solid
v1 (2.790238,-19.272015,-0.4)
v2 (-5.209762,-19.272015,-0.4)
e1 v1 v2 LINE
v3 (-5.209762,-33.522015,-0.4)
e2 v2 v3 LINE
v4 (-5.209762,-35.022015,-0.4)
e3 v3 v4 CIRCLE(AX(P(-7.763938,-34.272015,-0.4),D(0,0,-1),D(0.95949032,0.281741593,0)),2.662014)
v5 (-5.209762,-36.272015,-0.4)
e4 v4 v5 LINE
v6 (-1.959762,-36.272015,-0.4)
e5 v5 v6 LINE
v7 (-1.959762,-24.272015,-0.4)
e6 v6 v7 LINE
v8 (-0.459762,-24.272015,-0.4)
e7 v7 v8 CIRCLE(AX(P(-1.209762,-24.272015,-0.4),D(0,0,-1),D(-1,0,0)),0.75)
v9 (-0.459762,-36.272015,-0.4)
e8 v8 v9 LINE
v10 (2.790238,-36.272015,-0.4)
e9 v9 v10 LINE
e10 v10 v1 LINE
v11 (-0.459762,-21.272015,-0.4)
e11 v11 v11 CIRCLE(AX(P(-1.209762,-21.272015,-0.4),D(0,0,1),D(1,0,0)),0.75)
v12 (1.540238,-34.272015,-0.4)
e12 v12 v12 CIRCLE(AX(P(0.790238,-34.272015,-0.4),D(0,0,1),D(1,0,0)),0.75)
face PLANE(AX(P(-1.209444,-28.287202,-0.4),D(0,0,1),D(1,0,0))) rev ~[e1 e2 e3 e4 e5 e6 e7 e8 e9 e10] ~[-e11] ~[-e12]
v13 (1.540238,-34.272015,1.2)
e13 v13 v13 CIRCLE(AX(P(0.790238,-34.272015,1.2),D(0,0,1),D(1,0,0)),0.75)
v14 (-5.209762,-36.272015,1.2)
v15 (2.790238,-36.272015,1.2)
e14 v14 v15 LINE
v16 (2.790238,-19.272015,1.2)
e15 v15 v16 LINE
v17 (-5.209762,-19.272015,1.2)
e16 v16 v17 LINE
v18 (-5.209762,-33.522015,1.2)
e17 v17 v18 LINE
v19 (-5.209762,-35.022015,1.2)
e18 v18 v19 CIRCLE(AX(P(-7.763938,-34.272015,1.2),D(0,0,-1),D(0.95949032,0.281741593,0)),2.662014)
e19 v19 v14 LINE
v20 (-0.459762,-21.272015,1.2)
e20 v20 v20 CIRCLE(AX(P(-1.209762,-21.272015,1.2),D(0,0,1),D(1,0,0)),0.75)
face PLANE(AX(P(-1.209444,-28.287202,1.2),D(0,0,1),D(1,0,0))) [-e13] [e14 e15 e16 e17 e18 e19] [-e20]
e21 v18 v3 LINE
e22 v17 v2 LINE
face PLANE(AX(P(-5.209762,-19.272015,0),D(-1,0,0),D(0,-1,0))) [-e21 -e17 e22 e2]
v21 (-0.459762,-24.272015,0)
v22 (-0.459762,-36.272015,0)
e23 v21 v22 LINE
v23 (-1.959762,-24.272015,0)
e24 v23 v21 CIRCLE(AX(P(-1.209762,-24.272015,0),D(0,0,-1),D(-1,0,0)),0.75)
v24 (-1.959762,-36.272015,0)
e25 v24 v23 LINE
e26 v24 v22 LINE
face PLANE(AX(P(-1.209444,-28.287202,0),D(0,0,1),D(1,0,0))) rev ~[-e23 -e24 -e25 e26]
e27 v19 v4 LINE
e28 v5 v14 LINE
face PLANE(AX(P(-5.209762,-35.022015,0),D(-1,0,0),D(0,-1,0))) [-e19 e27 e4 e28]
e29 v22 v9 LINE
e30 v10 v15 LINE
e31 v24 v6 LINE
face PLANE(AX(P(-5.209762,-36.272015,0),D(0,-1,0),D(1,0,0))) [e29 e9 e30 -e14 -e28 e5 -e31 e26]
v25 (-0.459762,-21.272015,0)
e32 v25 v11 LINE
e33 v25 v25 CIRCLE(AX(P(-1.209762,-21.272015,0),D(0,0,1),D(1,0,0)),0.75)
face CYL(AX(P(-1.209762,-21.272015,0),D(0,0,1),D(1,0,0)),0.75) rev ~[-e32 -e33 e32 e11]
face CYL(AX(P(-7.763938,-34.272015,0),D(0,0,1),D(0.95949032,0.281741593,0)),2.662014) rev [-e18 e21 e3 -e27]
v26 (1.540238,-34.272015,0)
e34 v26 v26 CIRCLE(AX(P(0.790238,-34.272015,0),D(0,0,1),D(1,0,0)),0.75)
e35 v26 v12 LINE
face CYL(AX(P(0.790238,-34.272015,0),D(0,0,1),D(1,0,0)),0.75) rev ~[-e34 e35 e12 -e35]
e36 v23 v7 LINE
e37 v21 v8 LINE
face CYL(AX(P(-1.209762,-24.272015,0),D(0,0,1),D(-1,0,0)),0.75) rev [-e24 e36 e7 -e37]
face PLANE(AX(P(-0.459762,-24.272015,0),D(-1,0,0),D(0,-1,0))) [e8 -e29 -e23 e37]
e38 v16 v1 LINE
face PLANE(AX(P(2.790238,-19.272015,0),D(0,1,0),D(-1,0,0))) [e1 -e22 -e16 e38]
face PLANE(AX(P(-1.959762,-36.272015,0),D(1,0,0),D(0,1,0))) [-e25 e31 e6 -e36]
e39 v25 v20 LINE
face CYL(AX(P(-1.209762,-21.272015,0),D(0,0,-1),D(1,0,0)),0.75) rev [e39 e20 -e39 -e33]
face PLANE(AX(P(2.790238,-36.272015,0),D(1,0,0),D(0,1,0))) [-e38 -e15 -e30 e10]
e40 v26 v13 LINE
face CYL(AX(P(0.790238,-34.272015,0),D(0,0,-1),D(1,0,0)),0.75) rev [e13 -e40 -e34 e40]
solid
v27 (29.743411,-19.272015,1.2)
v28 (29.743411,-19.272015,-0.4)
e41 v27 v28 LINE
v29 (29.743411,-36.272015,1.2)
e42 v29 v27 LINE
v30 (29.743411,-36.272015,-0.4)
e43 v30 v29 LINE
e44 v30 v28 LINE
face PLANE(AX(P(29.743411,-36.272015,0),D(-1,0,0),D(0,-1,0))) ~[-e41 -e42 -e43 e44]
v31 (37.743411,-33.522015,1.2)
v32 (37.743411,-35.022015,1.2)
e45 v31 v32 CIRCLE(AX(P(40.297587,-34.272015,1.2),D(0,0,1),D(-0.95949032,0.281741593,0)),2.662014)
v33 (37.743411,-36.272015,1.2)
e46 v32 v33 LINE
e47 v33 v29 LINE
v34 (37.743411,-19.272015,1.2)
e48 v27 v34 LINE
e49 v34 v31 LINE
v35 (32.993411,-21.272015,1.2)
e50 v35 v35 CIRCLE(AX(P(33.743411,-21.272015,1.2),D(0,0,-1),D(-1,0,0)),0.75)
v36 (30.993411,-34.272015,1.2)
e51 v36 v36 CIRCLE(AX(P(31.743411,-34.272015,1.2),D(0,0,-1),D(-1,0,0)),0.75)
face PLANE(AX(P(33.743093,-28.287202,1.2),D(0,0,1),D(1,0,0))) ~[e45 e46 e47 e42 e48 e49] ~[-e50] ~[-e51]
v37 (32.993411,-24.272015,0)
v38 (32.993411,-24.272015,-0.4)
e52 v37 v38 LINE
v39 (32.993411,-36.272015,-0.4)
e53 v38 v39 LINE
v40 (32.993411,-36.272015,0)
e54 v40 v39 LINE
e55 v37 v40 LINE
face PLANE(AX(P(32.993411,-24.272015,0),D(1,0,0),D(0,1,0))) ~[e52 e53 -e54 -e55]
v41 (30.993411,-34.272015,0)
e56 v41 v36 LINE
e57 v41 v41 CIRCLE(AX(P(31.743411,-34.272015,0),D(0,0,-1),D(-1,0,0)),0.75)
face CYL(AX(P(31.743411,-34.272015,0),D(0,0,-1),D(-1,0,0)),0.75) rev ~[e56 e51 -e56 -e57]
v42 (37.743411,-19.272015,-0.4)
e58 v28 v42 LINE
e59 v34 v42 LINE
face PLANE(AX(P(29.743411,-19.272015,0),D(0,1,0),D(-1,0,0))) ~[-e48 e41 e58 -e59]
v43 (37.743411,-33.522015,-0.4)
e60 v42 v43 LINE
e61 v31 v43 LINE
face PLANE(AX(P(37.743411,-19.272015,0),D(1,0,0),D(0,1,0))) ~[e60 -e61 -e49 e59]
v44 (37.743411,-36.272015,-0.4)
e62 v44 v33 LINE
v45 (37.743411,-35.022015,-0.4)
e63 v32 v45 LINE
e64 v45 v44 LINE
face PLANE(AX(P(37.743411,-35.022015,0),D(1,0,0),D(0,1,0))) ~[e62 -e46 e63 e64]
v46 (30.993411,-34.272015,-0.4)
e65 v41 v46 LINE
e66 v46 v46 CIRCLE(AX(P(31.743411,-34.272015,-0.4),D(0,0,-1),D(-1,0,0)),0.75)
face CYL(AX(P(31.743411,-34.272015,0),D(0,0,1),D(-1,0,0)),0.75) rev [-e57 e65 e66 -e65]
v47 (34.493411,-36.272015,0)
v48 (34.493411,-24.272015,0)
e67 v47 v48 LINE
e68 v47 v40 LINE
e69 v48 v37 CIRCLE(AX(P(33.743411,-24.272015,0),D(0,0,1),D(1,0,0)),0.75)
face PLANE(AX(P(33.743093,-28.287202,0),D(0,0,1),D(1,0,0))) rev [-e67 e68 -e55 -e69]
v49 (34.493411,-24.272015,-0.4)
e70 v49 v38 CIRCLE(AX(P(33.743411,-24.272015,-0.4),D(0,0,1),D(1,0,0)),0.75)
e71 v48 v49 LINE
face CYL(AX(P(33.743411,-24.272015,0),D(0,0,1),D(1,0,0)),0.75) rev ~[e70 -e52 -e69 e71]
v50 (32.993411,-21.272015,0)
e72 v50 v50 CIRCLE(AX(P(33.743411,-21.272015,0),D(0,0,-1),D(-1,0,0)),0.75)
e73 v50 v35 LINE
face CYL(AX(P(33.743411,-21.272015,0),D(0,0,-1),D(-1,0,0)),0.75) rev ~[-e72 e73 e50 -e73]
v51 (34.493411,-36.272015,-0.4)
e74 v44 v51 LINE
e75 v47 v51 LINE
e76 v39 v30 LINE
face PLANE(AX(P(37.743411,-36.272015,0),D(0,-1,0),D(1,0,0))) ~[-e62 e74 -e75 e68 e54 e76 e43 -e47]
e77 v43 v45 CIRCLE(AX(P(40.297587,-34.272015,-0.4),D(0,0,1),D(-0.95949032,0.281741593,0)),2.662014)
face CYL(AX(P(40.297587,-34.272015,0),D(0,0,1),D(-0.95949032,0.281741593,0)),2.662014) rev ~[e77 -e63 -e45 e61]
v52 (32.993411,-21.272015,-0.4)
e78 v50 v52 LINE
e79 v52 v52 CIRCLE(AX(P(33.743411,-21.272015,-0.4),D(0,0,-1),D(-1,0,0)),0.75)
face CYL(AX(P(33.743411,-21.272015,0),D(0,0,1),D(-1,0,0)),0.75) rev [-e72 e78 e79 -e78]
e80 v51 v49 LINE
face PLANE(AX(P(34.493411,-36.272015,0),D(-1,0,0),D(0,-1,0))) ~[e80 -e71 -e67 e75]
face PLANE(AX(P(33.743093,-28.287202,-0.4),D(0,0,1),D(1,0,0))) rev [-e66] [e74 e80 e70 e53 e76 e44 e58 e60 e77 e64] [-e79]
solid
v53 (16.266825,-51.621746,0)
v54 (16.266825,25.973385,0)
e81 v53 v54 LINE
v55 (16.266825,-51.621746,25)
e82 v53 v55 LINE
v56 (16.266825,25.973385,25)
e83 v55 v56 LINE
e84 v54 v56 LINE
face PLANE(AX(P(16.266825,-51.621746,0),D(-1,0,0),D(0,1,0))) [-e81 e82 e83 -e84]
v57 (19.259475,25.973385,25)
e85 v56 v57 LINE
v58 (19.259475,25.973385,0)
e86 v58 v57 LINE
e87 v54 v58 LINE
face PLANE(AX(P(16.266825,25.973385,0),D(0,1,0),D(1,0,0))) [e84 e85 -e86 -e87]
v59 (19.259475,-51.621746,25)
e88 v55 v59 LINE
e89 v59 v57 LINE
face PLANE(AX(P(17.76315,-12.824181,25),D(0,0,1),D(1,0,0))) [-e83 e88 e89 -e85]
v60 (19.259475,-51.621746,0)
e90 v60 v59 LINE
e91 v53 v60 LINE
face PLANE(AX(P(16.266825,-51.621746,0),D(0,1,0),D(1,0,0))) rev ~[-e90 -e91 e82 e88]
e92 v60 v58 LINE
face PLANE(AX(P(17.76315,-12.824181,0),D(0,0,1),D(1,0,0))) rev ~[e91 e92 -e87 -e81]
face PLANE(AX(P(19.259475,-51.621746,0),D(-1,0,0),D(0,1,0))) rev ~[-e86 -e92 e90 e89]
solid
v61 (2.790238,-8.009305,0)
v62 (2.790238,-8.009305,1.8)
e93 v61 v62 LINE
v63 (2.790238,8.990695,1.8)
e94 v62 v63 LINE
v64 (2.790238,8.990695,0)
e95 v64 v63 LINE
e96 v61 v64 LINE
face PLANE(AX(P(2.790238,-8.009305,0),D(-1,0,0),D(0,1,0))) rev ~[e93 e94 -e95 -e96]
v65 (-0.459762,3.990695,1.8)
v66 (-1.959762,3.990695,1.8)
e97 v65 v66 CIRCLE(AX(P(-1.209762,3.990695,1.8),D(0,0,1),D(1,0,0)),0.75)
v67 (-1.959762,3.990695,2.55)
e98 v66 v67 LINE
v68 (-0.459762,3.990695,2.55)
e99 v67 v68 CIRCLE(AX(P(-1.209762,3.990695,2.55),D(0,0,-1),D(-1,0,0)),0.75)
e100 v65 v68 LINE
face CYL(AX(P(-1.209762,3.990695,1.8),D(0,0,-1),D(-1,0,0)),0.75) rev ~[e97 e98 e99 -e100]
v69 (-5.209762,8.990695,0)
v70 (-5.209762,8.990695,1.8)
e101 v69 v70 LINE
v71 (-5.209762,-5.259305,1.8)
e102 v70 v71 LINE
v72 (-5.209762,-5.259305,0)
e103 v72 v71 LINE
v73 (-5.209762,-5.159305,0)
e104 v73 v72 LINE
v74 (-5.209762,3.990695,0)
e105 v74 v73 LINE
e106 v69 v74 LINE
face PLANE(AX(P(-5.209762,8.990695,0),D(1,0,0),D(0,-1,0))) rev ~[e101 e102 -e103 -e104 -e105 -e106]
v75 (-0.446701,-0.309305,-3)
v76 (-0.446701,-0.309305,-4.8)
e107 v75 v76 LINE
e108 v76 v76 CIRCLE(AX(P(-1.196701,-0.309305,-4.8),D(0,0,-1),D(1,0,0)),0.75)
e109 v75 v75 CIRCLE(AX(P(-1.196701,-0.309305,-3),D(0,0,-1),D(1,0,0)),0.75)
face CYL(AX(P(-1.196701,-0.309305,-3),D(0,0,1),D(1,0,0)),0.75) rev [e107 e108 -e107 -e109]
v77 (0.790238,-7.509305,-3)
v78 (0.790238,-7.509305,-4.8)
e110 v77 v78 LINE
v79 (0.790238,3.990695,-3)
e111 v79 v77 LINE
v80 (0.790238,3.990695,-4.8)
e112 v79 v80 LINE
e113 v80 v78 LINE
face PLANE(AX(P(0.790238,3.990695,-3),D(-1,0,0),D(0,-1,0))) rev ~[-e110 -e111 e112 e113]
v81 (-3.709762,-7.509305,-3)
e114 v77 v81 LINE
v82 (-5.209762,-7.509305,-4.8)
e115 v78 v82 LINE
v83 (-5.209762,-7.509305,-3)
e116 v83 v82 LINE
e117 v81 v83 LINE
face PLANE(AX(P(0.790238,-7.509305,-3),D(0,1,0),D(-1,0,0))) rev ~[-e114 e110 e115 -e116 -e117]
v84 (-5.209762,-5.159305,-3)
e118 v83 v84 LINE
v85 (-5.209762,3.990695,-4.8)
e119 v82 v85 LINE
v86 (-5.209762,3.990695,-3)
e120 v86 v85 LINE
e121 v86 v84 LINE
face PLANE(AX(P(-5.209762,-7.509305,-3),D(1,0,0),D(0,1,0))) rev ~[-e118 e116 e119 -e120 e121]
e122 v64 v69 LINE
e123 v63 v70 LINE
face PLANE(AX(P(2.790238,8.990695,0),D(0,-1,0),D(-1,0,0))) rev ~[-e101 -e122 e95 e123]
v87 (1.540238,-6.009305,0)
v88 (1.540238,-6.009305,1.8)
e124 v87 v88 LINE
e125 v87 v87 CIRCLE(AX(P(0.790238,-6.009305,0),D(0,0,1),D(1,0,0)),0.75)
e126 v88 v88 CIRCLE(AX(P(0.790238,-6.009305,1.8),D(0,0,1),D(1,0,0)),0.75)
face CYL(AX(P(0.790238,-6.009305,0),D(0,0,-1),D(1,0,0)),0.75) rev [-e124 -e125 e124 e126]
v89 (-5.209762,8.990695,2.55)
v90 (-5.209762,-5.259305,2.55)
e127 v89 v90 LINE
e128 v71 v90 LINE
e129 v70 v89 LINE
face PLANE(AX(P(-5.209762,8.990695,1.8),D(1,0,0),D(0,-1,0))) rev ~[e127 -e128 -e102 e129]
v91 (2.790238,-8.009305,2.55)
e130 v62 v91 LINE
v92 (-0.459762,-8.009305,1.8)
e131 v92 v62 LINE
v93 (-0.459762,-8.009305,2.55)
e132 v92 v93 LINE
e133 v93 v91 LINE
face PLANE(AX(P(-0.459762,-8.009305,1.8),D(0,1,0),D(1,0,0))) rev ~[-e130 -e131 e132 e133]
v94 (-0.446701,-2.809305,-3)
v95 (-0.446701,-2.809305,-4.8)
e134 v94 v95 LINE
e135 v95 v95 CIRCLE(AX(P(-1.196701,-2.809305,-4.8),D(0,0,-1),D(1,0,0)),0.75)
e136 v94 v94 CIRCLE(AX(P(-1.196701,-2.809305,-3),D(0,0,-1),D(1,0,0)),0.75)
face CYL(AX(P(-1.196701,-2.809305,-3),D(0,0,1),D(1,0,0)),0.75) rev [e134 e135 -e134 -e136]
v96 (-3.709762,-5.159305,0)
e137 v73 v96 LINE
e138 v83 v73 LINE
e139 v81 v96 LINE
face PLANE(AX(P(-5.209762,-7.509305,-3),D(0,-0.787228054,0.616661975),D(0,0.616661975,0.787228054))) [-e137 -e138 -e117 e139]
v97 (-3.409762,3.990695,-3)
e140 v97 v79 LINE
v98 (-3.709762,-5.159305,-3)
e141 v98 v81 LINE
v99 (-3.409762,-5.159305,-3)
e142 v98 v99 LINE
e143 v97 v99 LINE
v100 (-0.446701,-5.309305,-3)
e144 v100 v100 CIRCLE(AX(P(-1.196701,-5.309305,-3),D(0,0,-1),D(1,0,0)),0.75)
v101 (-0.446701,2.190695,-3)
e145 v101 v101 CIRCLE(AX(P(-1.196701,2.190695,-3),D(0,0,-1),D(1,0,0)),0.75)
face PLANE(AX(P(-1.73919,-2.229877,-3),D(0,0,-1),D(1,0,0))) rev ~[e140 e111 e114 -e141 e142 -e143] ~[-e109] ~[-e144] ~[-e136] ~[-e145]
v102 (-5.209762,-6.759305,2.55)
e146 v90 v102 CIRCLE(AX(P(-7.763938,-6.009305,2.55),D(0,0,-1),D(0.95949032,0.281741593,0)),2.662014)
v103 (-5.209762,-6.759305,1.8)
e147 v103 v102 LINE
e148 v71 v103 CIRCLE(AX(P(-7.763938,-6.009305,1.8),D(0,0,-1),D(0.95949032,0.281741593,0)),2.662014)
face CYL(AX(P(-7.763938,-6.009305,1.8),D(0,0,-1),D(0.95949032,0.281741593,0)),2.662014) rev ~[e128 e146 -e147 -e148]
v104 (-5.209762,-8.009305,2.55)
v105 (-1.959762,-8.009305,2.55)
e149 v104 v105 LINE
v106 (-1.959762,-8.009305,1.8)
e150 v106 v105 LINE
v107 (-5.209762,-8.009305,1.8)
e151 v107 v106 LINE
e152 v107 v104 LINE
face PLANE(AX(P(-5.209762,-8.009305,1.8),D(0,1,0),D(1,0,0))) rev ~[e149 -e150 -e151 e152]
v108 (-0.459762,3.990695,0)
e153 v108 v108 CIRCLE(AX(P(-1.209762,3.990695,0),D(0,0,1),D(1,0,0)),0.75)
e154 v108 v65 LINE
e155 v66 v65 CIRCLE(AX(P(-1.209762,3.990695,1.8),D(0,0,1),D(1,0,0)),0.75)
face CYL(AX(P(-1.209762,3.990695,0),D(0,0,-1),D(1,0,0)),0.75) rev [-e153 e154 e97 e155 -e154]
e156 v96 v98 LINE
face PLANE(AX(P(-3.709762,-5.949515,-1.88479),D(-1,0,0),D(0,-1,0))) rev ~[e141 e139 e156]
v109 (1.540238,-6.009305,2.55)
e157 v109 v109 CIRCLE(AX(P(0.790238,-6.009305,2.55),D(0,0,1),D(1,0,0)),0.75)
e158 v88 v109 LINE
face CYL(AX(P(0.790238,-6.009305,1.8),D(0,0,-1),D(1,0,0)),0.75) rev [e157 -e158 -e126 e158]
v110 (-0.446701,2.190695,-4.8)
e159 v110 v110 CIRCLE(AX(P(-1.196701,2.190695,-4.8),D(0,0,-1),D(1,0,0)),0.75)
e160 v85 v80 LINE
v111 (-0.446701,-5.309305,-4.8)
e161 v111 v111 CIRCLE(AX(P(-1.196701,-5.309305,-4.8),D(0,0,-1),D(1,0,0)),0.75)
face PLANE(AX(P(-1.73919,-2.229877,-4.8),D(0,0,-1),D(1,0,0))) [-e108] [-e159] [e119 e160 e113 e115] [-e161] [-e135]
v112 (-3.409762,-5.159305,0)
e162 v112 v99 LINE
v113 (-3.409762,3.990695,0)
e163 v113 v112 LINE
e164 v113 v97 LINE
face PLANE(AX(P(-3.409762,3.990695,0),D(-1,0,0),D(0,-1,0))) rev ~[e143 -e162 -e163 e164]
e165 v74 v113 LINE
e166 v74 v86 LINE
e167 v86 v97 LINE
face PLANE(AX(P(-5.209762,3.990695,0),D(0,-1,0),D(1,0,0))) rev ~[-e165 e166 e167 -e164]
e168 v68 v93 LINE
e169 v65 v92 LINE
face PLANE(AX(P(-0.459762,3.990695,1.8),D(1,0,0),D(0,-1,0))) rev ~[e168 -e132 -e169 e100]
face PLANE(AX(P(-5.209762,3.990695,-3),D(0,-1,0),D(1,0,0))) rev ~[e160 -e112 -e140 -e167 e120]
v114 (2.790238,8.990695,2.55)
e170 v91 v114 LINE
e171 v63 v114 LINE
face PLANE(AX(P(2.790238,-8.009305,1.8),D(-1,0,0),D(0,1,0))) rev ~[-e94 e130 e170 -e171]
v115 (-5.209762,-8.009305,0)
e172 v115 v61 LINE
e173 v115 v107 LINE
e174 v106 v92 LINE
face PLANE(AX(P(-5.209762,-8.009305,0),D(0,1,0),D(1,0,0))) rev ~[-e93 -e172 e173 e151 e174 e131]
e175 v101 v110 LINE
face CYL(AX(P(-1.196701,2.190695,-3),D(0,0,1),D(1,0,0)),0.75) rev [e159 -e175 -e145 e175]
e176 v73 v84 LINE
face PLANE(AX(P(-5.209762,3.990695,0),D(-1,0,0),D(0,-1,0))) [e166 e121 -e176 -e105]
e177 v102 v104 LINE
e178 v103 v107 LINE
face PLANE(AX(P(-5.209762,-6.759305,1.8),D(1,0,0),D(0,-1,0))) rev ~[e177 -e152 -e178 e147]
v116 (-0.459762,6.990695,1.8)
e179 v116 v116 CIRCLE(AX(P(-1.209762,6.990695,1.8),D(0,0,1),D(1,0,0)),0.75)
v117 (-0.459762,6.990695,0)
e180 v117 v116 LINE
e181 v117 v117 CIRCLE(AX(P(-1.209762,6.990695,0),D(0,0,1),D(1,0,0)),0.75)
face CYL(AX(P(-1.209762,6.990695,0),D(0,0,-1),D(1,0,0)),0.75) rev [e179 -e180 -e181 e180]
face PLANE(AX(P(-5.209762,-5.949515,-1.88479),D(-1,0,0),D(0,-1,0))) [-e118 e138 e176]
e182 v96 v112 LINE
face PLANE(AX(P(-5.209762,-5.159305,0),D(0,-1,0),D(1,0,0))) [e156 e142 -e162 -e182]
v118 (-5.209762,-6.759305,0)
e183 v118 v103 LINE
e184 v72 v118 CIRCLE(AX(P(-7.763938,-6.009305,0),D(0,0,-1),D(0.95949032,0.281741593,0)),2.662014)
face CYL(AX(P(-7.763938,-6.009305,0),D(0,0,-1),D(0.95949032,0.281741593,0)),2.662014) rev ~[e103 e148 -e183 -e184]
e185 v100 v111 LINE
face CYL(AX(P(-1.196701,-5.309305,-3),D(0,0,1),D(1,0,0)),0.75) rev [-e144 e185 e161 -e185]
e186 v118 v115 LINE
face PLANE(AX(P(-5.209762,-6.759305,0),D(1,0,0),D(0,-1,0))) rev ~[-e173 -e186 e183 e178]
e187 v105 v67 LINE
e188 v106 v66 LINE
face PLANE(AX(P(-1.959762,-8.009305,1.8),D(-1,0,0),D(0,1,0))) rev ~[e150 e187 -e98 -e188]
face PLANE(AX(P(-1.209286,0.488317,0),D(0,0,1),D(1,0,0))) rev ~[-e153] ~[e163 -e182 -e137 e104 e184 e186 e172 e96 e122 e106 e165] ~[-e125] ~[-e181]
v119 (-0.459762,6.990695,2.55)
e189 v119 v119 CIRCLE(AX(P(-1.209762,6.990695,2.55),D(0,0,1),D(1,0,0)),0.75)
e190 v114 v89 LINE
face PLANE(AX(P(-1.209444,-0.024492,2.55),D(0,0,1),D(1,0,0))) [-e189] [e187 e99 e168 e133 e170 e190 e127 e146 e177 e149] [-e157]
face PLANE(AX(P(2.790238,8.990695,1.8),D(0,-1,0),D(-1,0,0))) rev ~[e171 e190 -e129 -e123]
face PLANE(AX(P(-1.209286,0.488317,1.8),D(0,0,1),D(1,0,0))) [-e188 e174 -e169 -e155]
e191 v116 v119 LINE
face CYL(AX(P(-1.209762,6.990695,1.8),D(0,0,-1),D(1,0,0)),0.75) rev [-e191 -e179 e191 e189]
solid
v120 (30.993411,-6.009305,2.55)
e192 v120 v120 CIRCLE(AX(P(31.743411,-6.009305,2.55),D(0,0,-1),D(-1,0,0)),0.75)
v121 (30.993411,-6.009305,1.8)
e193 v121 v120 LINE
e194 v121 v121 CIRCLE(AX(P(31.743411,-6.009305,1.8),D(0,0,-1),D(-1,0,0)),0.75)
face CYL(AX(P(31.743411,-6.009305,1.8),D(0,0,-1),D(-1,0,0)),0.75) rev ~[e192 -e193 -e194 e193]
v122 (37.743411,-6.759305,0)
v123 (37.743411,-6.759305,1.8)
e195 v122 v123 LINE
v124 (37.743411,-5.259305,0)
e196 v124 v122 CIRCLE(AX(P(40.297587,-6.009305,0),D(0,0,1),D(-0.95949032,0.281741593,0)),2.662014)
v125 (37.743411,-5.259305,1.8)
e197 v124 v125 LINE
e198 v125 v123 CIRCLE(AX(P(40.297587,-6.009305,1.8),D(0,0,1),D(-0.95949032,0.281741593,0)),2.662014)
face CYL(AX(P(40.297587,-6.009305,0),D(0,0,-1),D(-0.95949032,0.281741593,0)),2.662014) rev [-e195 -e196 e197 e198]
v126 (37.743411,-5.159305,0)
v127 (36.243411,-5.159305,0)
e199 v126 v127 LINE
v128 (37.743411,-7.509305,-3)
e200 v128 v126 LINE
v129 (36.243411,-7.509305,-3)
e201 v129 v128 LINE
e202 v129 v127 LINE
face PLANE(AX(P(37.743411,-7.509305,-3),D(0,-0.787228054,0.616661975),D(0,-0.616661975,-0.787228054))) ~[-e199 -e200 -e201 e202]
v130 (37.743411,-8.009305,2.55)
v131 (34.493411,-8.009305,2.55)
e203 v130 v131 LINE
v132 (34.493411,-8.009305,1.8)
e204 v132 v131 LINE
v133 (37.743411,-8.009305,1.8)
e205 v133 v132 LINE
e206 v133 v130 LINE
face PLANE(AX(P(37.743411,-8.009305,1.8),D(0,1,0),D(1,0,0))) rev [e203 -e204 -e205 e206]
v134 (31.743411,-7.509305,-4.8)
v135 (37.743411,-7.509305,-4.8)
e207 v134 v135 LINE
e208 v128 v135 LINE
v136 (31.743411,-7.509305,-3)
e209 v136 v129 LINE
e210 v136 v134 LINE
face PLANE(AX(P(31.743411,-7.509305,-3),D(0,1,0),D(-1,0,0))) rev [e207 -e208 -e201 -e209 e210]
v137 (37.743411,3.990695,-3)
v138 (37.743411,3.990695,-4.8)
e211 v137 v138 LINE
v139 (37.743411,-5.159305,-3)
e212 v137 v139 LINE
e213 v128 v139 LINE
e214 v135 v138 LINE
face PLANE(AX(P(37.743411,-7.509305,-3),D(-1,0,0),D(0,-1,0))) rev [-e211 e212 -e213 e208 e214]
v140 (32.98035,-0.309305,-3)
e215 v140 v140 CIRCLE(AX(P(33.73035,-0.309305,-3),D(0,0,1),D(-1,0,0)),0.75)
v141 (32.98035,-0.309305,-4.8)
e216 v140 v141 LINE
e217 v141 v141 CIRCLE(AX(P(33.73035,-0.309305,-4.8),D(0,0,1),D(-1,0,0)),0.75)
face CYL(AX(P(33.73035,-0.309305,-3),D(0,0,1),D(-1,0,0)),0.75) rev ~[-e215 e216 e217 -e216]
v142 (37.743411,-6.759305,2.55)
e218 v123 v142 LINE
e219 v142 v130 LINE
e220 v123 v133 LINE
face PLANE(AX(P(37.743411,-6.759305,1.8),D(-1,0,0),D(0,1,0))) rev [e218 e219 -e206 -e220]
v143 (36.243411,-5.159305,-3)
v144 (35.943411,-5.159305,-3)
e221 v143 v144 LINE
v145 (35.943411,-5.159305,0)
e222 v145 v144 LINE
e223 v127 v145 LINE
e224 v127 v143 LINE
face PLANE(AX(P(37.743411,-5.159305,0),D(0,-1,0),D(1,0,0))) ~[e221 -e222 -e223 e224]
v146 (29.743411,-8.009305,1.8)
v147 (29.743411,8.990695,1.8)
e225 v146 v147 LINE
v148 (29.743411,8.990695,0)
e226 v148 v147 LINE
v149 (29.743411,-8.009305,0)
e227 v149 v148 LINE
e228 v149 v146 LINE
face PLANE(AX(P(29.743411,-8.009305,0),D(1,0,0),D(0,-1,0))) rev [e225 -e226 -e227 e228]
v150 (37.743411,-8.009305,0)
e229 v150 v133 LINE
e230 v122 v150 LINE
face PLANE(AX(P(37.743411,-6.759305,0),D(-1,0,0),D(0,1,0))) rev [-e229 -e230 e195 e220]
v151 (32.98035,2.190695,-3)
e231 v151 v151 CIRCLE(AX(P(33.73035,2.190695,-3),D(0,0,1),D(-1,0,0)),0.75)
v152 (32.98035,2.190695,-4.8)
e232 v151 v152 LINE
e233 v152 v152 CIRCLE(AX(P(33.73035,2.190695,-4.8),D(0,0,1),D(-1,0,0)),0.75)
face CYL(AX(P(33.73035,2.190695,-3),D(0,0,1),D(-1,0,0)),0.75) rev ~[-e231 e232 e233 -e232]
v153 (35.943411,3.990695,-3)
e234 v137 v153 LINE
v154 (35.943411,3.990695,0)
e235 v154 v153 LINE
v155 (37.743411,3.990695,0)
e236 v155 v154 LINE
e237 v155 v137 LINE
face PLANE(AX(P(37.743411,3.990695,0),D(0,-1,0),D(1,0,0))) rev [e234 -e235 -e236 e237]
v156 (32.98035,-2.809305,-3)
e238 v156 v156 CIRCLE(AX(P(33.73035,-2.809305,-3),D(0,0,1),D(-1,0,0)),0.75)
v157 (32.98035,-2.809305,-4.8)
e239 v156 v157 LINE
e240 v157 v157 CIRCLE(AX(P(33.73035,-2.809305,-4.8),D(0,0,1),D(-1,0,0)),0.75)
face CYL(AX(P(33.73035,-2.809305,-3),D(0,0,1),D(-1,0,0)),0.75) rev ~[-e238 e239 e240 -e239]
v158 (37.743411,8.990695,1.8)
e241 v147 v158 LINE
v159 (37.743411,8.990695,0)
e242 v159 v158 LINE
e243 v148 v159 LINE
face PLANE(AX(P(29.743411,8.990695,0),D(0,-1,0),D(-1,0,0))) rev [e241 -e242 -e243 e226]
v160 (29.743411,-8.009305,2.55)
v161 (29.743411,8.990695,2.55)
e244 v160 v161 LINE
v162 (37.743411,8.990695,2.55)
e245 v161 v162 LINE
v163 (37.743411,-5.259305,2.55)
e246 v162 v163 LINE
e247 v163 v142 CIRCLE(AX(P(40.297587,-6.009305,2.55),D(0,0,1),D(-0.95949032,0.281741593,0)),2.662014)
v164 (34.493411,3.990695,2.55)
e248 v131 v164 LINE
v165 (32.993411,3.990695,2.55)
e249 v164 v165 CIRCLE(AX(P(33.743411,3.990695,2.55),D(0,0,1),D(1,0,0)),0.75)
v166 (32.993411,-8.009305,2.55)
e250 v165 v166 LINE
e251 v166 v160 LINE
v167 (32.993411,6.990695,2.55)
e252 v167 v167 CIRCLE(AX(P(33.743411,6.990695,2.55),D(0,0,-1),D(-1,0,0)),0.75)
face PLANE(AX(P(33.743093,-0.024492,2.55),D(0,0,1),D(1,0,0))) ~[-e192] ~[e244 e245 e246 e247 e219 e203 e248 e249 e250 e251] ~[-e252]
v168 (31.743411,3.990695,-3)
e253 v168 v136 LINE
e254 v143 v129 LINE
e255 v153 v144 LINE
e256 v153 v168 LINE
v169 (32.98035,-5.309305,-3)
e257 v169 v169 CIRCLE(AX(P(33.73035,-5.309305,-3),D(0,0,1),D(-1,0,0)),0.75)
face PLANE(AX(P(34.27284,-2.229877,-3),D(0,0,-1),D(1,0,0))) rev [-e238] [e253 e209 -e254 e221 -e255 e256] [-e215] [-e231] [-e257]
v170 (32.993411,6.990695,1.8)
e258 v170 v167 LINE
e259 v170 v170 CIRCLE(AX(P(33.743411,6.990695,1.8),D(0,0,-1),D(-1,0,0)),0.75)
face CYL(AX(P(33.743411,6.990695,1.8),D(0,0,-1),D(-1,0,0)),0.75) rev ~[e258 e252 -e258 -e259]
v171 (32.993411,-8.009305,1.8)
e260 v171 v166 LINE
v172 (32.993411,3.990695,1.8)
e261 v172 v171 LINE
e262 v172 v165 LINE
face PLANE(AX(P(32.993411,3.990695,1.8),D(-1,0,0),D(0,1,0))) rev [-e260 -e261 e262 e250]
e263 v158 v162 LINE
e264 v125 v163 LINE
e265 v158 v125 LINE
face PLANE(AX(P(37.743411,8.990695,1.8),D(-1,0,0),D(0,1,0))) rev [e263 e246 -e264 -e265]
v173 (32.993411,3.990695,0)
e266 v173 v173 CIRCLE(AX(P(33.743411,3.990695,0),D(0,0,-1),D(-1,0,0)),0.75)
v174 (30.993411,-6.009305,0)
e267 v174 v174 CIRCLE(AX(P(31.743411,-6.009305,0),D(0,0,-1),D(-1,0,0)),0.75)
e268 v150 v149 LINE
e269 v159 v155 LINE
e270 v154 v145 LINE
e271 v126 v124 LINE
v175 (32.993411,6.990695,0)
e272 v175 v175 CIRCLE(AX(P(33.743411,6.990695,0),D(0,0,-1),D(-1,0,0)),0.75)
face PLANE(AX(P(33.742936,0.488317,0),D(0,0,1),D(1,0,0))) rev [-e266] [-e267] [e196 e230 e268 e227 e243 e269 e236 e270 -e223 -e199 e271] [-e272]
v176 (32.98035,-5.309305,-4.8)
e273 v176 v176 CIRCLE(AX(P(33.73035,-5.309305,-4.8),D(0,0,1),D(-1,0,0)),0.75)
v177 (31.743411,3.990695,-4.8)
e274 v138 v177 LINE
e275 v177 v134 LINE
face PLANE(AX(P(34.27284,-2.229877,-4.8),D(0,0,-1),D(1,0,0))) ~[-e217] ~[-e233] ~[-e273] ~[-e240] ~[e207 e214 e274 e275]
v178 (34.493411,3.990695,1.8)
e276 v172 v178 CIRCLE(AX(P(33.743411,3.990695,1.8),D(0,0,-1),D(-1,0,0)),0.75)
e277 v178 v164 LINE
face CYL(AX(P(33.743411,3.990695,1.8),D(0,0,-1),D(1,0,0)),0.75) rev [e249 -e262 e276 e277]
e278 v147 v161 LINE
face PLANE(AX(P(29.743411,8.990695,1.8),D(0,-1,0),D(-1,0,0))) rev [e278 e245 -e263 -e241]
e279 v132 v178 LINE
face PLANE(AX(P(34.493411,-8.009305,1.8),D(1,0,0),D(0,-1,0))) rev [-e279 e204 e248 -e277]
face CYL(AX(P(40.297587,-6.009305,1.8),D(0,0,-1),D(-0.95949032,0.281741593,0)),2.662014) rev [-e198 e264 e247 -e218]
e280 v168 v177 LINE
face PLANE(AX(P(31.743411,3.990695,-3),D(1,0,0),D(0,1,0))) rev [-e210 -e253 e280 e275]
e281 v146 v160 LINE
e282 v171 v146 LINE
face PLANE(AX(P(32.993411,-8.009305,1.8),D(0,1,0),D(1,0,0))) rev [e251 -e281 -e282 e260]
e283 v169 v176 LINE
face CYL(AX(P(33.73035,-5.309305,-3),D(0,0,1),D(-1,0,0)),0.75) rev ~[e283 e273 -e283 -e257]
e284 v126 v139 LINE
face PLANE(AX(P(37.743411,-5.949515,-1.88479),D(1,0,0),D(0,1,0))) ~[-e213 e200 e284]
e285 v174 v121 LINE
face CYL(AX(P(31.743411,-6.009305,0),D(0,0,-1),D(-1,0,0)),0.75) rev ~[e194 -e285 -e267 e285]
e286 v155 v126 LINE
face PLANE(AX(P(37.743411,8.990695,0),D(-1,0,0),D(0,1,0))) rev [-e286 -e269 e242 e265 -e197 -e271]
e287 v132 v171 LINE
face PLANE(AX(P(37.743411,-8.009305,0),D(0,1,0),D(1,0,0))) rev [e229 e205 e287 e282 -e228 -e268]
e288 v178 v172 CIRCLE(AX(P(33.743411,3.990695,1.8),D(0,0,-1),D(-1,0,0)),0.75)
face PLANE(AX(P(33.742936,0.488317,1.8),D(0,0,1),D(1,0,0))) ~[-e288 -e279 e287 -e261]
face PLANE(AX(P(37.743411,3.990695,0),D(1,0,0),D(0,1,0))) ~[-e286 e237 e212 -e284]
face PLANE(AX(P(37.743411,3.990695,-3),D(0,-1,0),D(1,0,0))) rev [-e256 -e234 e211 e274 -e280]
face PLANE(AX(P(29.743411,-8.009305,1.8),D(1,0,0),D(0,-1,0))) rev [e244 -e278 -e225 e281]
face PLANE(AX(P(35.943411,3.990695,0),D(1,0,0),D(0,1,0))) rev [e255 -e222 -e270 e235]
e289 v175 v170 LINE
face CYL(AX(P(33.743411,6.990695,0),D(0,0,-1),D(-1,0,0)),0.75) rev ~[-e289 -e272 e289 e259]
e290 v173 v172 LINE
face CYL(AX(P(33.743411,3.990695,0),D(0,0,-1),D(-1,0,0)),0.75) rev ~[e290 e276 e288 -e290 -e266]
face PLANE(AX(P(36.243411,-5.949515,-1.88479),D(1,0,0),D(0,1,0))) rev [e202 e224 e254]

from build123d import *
from build123d import SkipClean  # not in build123d's __all__

# Parameters (mm, degrees)
F0_R      = 0.75
F1_DEPTH  = 1.8
F2_R      = 0.75
F3_DEPTH  = 0.75
F5_DEPTH  = 1.2
F6_DEPTH  = 0.4
F4_W      = 1.8
F4_H      = 9.15
F7_DEPTH  = 3
F8_R      = 0.75
F8_W      = 1.8
F8_H      = 9.15
F9_DEPTH  = 1.8
F11_DEPTH = 1.5
F0_W      = 2.992650494
F0_H      = 77.5951314718
F12_DEPTH = 25


# Not quite as in the source:
# - a feature names something its author has since deleted; it is built from what else it names


with BuildPart() as f1:
    # F0 (on Top) → F1 (new body)
    with BuildSketch(Plane.XY):
        with BuildLine():
            Line((2.790238331, 8.9906946085), (-5.209761669, 8.9906946085))
            Line((-5.209761669, 8.9906946085), (-5.209761669, -5.2593053915))
            ThreePointArc((-5.209761669, -5.2593053915), (-5.1019243438, -6.0093053915), (-5.209761669, -6.7593053915))
            Line((-5.209761669, -6.7593053915), (-5.209761669, -8.0093053915))
            Line((-5.209761669, -8.0093053915), (2.790238331, -8.0093053915))
            Line((2.790238331, -8.0093053915), (2.790238331, 8.9906946085))
        make_face()
        with Locations((0.790238331, -6.0093053915)):
            Circle(F0_R, mode=Mode.SUBTRACT)
        with Locations((-1.209761669, 3.9906946085)):
            Circle(F0_R, mode=Mode.SUBTRACT)
        with Locations((-1.209761669, 6.9906946085)):
            Circle(F0_R, mode=Mode.SUBTRACT)
    extrude(amount=F1_DEPTH)

    # F2 (on face) → F3 (join)
    with BuildSketch(Plane.XY.offset(1.8)):
        with BuildLine():
            ThreePointArc((-1.959761669, 3.9906946085), (-1.209761669, 4.7406946085), (-0.459761669, 3.9906946085))
            Line((-0.459761669, 3.9906946085), (-0.459761669, -8.0093053915))
            Line((-0.459761669, -8.0093053915), (2.790238331, -8.0093053915))
            Line((2.790238331, -8.0093053915), (2.790238331, 8.9906946085))
            Line((2.790238331, 8.9906946085), (-5.209761669, 8.9906946085))
            Line((-5.209761669, 8.9906946085), (-5.209761669, -5.2593053915))
            ThreePointArc((-5.209761669, -5.2593053915), (-5.1019243438, -6.0093053915), (-5.209761669, -6.7593053915))
            Line((-5.209761669, -6.7593053915), (-5.209761669, -8.0093053915))
            Line((-5.209761669, -8.0093053915), (-1.959761669, -8.0093053915))
            Line((-1.959761669, -8.0093053915), (-1.959761669, 3.9906946085))
        make_face()
        with Locations((0.790238331, -6.0093053915)):
            Circle(F2_R, mode=Mode.SUBTRACT)
        with Locations((-1.209761669, 6.9906946085)):
            Circle(F2_R, mode=Mode.SUBTRACT)
    with SkipClean():  # cleaning this boolean's faces spoils the solid; the shape is the same uncleaned
        extrude(amount=F3_DEPTH)

    # F4 (on face) → F7 (join)
    with BuildSketch(Plane(origin=(0, 0, 0), x_dir=(1, 0, 0), z_dir=(0, 0, -1))):
        with Locations((-4.309761669, 0.5843053915)):
            Rectangle(F4_W, F4_H)
    with SkipClean():  # cleaning this boolean's faces spoils the solid; the shape is the same uncleaned
        extrude(amount=F7_DEPTH)

    # F8 (on face) → F9 (join)
    with BuildSketch(Plane(origin=(0, 0, -3), x_dir=(1, 0, 0), z_dir=(0, 0, -1))):
        Polygon((-3.409761669, 5.1593053915), (-3.409761669, -3.9906946085), (0.790238331, -3.9906946085), (0.790238331, 7.5093053915), (-5.209761669, 7.5093053915), (-5.209761669, 5.1593053915), align=None)
        with Locations((-1.196700694, -2.1906946085)):
            Circle(F8_R, mode=Mode.SUBTRACT)
        with Locations((-1.196700694, 0.3093053915)):
            Circle(F8_R, mode=Mode.SUBTRACT)
        with Locations((-1.196700694, 2.8093053915)):
            Circle(F8_R, mode=Mode.SUBTRACT)
        with Locations((-1.196700694, 5.3093053915)):
            Circle(F8_R, mode=Mode.SUBTRACT)
        with Locations((-4.309761669, 0.5843053915)):
            Rectangle(F8_W, F8_H)
    with SkipClean():  # cleaning this boolean's faces spoils the solid; the shape is the same uncleaned
        extrude(amount=F9_DEPTH)

    # F10 (on face) → F11 (join)
    with BuildSketch(Plane(origin=(-5.209761669, 0, 0), x_dir=(0, -1, 0), z_dir=(-1, 0, 0))):
        Polygon((5.1593053915, 0), (5.1593053915, -3), (7.5093053915, -3), align=None)
    with SkipClean():  # cleaning this boolean's faces spoils the solid; the shape is the same uncleaned
        extrude(amount=-F11_DEPTH)


with BuildPart() as f5:
    # F0 (on Top) → F5 (new body)
    with BuildSketch(Plane.XY):
        with BuildLine():
            Line((-5.209761669, -35.0220153915), (-5.209761669, -36.2720153915))
            Line((-5.209761669, -36.2720153915), (-1.959761669, -36.2720153915))
            Line((-1.959761669, -36.2720153915), (-1.959761669, -24.2720153915))
            ThreePointArc((-1.959761669, -24.2720153915), (-1.209761669, -23.5220153915), (-0.459761669, -24.2720153915))
            Line((-0.459761669, -24.2720153915), (-0.459761669, -36.2720153915))
            Line((-0.459761669, -36.2720153915), (2.790238331, -36.2720153915))
            Line((2.790238331, -36.2720153915), (2.790238331, -19.2720153915))
            Line((2.790238331, -19.2720153915), (-5.209761669, -19.2720153915))
            Line((-5.209761669, -19.2720153915), (-5.209761669, -33.5220153915))
            ThreePointArc((-5.209761669, -33.5220153915), (-5.1019243438, -34.2720153915), (-5.209761669, -35.0220153915))
        make_face()
        with Locations((0.790238331, -34.2720153915)):
            Circle(F0_R, mode=Mode.SUBTRACT)
        with Locations((-1.209761669, -21.2720153915)):
            Circle(F0_R, mode=Mode.SUBTRACT)
        with BuildLine():
            Line((-1.959761669, -24.2720153915), (-1.959761669, -36.2720153915))
            Line((-1.959761669, -36.2720153915), (-0.459761669, -36.2720153915))
            Line((-0.459761669, -36.2720153915), (-0.459761669, -24.2720153915))
            ThreePointArc((-0.459761669, -24.2720153915), (-1.209761669, -25.0220153915), (-1.959761669, -24.2720153915))
        make_face()
        with BuildLine():
            ThreePointArc((-0.459761669, -24.2720153915), (-1.209761669, -23.5220153915), (-1.959761669, -24.2720153915))
            ThreePointArc((-1.959761669, -24.2720153915), (-1.209761669, -25.0220153915), (-0.459761669, -24.2720153915))
        make_face()
    extrude(amount=F5_DEPTH)

    # F0 (on Top) → F6 (join)
    with BuildSketch(Plane.XY):
        with BuildLine():
            Line((-5.209761669, -35.0220153915), (-5.209761669, -36.2720153915))
            Line((-5.209761669, -36.2720153915), (-1.959761669, -36.2720153915))
            Line((-1.959761669, -36.2720153915), (-1.959761669, -24.2720153915))
            ThreePointArc((-1.959761669, -24.2720153915), (-1.209761669, -23.5220153915), (-0.459761669, -24.2720153915))
            Line((-0.459761669, -24.2720153915), (-0.459761669, -36.2720153915))
            Line((-0.459761669, -36.2720153915), (2.790238331, -36.2720153915))
            Line((2.790238331, -36.2720153915), (2.790238331, -19.2720153915))
            Line((2.790238331, -19.2720153915), (-5.209761669, -19.2720153915))
            Line((-5.209761669, -19.2720153915), (-5.209761669, -33.5220153915))
            ThreePointArc((-5.209761669, -33.5220153915), (-5.1019243438, -34.2720153915), (-5.209761669, -35.0220153915))
        make_face()
        with Locations((0.790238331, -34.2720153915)):
            Circle(F0_R, mode=Mode.SUBTRACT)
        with Locations((-1.209761669, -21.2720153915)):
            Circle(F0_R, mode=Mode.SUBTRACT)
    extrude(amount=-F6_DEPTH)


with BuildPart() as f12:
    # F0 (on Top) → F12 (new body)
    with BuildSketch(Plane.XY):
        with Locations((17.7631499246, -12.824180536)):
            Rectangle(F0_W, F0_H)
    extrude(amount=F12_DEPTH)


with BuildPart() as f13_1:
    # F13: instance of F5
    add(f5.part.mirror(Plane(origin=(16.2668246776, -12.824180536, 12.5), x_dir=(0, -1, 0), z_dir=(-1, 0, 0))), clean=False)


with BuildPart() as f13_2:
    # F13: instance of F1
    add(f1.part.mirror(Plane(origin=(16.2668246776, -12.824180536, 12.5), x_dir=(0, -1, 0), z_dir=(-1, 0, 0))), clean=False)


solid = Compound([f1.part, f5.part, f12.part, f13_1.part, f13_2.part])
